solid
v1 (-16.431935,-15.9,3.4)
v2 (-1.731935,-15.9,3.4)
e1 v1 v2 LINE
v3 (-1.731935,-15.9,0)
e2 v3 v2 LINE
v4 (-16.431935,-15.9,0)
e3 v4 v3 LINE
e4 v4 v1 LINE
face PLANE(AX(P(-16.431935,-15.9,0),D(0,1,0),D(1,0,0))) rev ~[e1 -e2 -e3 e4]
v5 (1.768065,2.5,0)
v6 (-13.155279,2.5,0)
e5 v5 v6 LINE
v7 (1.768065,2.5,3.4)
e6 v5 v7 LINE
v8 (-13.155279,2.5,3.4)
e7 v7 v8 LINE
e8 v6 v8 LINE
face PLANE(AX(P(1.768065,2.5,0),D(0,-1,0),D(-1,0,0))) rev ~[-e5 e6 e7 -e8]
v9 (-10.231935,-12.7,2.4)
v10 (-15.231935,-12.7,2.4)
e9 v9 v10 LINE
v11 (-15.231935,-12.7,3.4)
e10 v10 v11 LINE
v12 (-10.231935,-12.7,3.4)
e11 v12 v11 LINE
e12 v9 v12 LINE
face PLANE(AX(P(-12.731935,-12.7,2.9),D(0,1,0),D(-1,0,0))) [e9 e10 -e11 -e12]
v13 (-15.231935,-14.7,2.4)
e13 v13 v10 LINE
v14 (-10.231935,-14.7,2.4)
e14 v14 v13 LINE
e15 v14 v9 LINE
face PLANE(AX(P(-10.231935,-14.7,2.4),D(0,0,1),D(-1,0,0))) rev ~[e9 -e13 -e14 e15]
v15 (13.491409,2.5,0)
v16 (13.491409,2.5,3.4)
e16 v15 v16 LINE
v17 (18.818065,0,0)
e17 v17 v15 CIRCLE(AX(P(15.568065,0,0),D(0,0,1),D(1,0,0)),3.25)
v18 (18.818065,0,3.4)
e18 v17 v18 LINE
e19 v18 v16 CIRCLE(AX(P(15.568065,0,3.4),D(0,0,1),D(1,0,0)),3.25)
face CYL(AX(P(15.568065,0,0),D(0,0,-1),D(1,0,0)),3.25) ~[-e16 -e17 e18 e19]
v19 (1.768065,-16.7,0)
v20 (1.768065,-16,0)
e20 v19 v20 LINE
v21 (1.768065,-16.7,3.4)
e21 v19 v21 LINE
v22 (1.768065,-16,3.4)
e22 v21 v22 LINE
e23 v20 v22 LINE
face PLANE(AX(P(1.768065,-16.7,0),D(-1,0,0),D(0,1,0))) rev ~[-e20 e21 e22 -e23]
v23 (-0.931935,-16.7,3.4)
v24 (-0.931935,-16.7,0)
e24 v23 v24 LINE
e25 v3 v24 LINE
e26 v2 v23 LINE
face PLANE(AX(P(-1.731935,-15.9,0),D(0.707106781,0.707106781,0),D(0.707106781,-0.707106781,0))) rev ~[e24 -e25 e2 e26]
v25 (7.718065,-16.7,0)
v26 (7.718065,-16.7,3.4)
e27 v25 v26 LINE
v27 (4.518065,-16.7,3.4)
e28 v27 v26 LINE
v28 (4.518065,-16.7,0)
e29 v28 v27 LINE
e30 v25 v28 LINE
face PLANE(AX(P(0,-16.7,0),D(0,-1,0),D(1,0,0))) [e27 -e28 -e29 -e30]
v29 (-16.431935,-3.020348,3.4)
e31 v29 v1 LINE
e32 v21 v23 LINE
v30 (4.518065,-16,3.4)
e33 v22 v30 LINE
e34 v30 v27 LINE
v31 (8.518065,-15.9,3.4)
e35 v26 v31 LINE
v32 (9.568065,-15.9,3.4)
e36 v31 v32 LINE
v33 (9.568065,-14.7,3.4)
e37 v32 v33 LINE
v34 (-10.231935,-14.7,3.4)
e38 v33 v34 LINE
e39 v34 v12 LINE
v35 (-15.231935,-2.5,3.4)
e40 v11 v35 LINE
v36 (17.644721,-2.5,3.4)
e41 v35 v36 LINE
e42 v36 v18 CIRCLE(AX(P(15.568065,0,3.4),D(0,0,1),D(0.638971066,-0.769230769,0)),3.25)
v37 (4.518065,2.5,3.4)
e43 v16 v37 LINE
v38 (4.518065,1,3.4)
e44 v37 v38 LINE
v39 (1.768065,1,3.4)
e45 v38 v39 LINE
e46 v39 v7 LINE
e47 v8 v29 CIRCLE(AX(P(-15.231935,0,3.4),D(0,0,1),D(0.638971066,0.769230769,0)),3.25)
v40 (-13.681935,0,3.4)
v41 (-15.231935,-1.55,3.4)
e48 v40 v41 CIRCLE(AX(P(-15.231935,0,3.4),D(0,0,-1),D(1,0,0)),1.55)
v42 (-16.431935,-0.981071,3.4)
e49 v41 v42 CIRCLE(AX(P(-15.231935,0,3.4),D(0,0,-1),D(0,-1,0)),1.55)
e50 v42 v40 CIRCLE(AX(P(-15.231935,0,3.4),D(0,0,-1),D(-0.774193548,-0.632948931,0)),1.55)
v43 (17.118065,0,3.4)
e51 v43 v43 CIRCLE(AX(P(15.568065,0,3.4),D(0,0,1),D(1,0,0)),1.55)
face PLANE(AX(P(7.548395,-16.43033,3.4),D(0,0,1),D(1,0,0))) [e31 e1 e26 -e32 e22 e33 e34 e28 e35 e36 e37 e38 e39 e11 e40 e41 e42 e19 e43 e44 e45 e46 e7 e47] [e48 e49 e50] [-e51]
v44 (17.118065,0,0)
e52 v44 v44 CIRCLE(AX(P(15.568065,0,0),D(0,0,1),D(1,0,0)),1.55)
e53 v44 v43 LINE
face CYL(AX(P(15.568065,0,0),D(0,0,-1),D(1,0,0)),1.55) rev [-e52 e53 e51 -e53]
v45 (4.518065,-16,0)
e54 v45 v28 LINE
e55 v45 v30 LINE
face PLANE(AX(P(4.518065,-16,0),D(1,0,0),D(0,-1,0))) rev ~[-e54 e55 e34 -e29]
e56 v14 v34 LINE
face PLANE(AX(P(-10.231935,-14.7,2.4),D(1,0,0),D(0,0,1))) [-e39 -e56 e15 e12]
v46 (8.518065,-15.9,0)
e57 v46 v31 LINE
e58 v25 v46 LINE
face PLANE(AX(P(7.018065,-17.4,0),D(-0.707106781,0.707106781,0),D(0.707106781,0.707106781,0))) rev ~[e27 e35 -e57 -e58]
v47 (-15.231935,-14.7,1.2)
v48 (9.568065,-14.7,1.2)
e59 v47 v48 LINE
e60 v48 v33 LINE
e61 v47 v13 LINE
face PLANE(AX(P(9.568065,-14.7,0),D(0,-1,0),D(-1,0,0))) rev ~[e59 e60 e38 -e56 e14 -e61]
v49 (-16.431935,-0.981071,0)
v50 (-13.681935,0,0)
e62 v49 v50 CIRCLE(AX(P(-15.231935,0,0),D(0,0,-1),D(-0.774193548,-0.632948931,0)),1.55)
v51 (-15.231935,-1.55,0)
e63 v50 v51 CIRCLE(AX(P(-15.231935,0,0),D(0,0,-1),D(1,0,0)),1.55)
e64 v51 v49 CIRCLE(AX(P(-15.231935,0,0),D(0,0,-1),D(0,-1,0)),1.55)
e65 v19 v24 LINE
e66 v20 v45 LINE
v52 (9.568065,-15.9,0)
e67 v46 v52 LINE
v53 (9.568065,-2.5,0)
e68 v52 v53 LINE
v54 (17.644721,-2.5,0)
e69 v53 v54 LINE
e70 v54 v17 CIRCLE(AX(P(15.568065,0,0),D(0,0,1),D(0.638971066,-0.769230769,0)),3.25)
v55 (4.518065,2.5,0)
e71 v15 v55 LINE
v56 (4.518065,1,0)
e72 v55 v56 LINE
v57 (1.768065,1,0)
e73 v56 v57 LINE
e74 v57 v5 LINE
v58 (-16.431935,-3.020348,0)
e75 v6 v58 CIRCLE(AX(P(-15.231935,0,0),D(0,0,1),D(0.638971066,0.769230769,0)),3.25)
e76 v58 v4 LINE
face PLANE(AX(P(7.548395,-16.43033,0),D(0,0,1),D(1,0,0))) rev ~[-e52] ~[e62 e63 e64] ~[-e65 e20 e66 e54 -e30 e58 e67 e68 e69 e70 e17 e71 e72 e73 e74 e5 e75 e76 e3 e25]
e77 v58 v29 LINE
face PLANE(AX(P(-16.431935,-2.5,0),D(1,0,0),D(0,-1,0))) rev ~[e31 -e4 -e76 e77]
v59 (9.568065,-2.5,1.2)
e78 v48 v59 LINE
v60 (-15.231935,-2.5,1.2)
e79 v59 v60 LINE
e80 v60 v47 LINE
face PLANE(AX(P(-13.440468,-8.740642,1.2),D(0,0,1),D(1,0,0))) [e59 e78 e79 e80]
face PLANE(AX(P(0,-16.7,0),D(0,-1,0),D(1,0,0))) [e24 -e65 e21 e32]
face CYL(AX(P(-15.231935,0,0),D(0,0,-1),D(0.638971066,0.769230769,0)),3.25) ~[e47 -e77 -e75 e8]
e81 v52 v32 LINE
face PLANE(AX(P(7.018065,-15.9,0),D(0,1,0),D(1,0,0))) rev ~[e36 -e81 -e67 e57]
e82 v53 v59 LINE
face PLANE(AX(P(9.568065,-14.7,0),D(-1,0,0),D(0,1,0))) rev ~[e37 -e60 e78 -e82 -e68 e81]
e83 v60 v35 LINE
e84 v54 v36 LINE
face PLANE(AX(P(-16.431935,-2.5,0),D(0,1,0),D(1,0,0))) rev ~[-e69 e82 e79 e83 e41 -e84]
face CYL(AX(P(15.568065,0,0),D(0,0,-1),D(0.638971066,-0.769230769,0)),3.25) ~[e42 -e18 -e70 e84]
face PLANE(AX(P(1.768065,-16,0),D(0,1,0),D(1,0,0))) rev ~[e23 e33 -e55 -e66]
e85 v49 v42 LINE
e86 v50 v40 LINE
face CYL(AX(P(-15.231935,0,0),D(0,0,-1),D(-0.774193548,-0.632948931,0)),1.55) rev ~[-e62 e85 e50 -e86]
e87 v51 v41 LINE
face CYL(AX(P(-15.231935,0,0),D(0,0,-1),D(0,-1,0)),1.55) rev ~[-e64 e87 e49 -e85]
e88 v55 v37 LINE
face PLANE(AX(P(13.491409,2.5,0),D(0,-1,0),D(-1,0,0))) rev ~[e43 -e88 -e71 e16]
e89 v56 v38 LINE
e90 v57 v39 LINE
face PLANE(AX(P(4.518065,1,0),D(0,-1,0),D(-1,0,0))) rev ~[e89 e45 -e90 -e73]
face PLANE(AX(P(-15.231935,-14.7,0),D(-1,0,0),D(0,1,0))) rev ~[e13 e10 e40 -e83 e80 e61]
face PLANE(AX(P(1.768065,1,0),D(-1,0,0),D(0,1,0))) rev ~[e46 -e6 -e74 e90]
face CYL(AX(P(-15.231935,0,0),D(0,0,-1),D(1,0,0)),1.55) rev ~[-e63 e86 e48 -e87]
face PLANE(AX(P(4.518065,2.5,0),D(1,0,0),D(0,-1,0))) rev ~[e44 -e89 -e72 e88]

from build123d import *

# Parameters (mm, degrees)
F0_W        = 21.3
F0_H        = 2.5
F0_R        = 1.55
F1_DEPTH    = 3.4
F0_W_2      = 1.2
F0_H_2      = 1.2
F0_W_3      = 3.5
F2_DEPTH    = 3.4
F0_H_3      = 12.2
F3_DEPTH    = 1.2
F4_W        = 5
F4_H        = 1
F5_DEPTH    = 2
F6_T4_DEPTH = 3.4
F6_T9_DEPTH = 3.4


# Not quite as in the source:
# - a fillet or chamfer that OpenCascade refuses, or shapes differently, is made with other operations: its cross-section is extruded or revolved along the edge and cut away or added
# - a feature names something its author has since deleted; it is built from what else it names


with BuildPart() as f1:
    # F0 (on Top) → F1 (new body)
    with BuildSketch(Plane.XY):
        with BuildLine():
            ThreePointArc((-16.4319353276, -0.9810708435), (-15.752751994, 1.4598801321), (-13.6819353276, 0))
            ThreePointArc((-13.6819353276, 0), (-14.1359198167, -1.0960155108), (-15.2319353276, -1.55))
            Line((-15.2319353276, -1.55), (-15.2319353276, -2.5))
            Line((-15.2319353276, -2.5), (-13.1552793618, -2.5))
            ThreePointArc((-13.1552793618, -2.5), (-12.2898585195, -1.3808273084), (-11.9819353276, 0))
            ThreePointArc((-11.9819353276, 0), (-12.2898585195, 1.3808273084), (-13.1552793618, 2.5))
            ThreePointArc((-13.1552793618, 2.5), (-18.0266966766, 1.6588577401), (-16.4319353276, -3.0203476621))
            Line((-16.4319353276, -3.0203476621), (-16.4319353276, -2.5))
            Line((-16.4319353276, -2.5), (-16.4319353276, -0.9810708435))
        make_face()
        with BuildLine():
            ThreePointArc((-15.2319353276, -1.55), (-15.8959534721, -1.4005641377), (-16.4319353276, -0.9810708435))
            Line((-16.4319353276, -0.9810708435), (-16.4319353276, -2.5))
            Line((-16.4319353276, -2.5), (-15.2319353276, -2.5))
            Line((-15.2319353276, -2.5), (-15.2319353276, -1.55))
        make_face()
        with BuildLine():
            ThreePointArc((-11.9819353276, 0), (-12.2898585195, -1.3808273084), (-13.1552793618, -2.5))
            Line((-13.1552793618, -2.5), (-11.7319353276, -2.5))
            Line((-11.7319353276, -2.5), (-11.7319353276, 0))
            Line((-11.7319353276, 0), (-11.9819353276, 0))
        make_face()
        with BuildLine():
            Line((1.7680646724, 2.5), (-13.1552793618, 2.5))
            ThreePointArc((-13.1552793618, 2.5), (-12.2898585195, 1.3808273084), (-11.9819353276, 0))
            Line((-11.9819353276, 0), (-11.7319353276, 0))
            Line((-11.7319353276, 0), (9.5680646724, 0))
            Line((9.5680646724, 0), (9.5680646724, -2.5))
            Line((9.5680646724, -2.5), (13.4914087067, -2.5))
            ThreePointArc((13.4914087067, -2.5), (12.3180646724, 0), (13.4914087067, 2.5))
            Line((13.4914087067, 2.5), (4.5180646724, 2.5))
            Line((4.5180646724, 2.5), (4.5180646724, 1))
            Line((4.5180646724, 1), (1.7680646724, 1))
            Line((1.7680646724, 1), (1.7680646724, 2.5))
        make_face()
        with Locations((-1.0819353276, -1.25)):
            Rectangle(F0_W, F0_H)
        with BuildLine():
            ThreePointArc((13.4914087067, 2.5), (12.3180646724, 0), (13.4914087067, -2.5))
            Line((13.4914087067, -2.5), (17.6447206382, -2.5))
            ThreePointArc((17.6447206382, -2.5), (18.5101414805, -1.3808273084), (18.8180646724, 0))
            ThreePointArc((18.8180646724, 0), (16.9488919809, 2.942076808), (13.4914087067, 2.5))
        make_face()
        with Locations((15.5680646724, 0)):
            Circle(F0_R, mode=Mode.SUBTRACT)
    extrude(amount=F1_DEPTH)

    # F0 (on Top) → F2 (join)
    with BuildSketch(Plane.XY):
        with BuildLine():
            ThreePointArc((-15.2319353276, -3.25), (-15.8428240646, -3.1920706369), (-16.4319353276, -3.0203476621))
            Line((-16.4319353276, -3.0203476621), (-16.4319353276, -14.7))
            Line((-16.4319353276, -14.7), (-15.2319353276, -14.7))
            Line((-15.2319353276, -14.7), (-15.2319353276, -3.25))
        make_face()
        with BuildLine():
            Line((-15.2319353276, -2.5), (-16.4319353276, -2.5))
            Line((-16.4319353276, -2.5), (-16.4319353276, -3.0203476621))
            ThreePointArc((-16.4319353276, -3.0203476621), (-15.8428240646, -3.1920706369), (-15.2319353276, -3.25))
            Line((-15.2319353276, -3.25), (-15.2319353276, -2.5))
        make_face()
        with Locations((-15.8319353276, -15.3)):
            Rectangle(F0_W_2, F0_H_2)
        with Locations((-13.4819353276, -15.3)):
            Rectangle(F0_W_3, F0_H_2)
        Polygon((9.5680646724, -14.7), (-11.7319353276, -14.7), (-11.7319353276, -15.9), (-0.2319353276, -15.9), (7.0180646724, -15.9), (9.5680646724, -15.9), align=None)
        Polygon((7.0180646724, -15.9), (-0.2319353276, -15.9), (-0.2319353276, -16.7), (1.7680646724, -16.7), (1.7680646724, -16), (4.5180646724, -16), (4.5180646724, -16.7), (7.0180646724, -16.7), align=None)
    extrude(amount=F2_DEPTH)

    # F0 (on Top) → F3 (join)
    with BuildSketch(Plane.XY):
        with BuildLine():
            ThreePointArc((-13.1552793618, -2.5), (-14.1279652193, -3.0567548152), (-15.2319353276, -3.25))
            Line((-15.2319353276, -3.25), (-15.2319353276, -14.7))
            Line((-15.2319353276, -14.7), (-11.7319353276, -14.7))
            Line((-11.7319353276, -14.7), (-11.7319353276, -2.5))
            Line((-11.7319353276, -2.5), (-13.1552793618, -2.5))
        make_face()
        with BuildLine():
            Line((-13.1552793618, -2.5), (-15.2319353276, -2.5))
            Line((-15.2319353276, -2.5), (-15.2319353276, -3.25))
            ThreePointArc((-15.2319353276, -3.25), (-14.1279652193, -3.0567548152), (-13.1552793618, -2.5))
        make_face()
        with Locations((-1.0819353276, -8.6)):
            Rectangle(F0_W, F0_H_3)
    extrude(amount=F3_DEPTH)

    # F4 (on face) → F5 (join)
    with BuildSketch(Plane(origin=(0, -14.7, 0), x_dir=(-1, 0, 0), z_dir=(0, 1, 0))):
        with Locations((12.7319353276, 2.9)):
            Rectangle(F4_W, F4_H)
    extrude(amount=F5_DEPTH)

    # F6: chamfer of 1.5 on 2 edges, made by hand


with BuildPart() as f6_tool2:
    # F6_s3 → F6_t4 (new body)
    with BuildSketch(Plane.XY):
        Polygon((-1.7319353276, -15.9), (-0.2319353276, -17.4), (-0.2319353276, -15.9), align=None)
    extrude(amount=F6_T4_DEPTH)

    split(bisect_by=Plane.XZ.offset(16.7), keep=Keep.BOTTOM)


with BuildPart() as f1_1:
    add(f1.part)

    # F6_t1: union F6_tool2
    add(f6_tool2.part)


with BuildPart() as f6_tool7:
    # F6_s8 → F6_t9 (new body)
    with BuildSketch(Plane.XY):
        Polygon((7.0180646724, -17.4), (8.5180646724, -15.9), (7.0180646724, -15.9), align=None)
    extrude(amount=F6_T9_DEPTH)

    split(bisect_by=Plane.XZ.offset(16.7), keep=Keep.BOTTOM)


with BuildPart() as f1_2:
    add(f1_1.part)

    # F6_t6: union F6_tool7
    add(f6_tool7.part)


solid = f1_2.part
